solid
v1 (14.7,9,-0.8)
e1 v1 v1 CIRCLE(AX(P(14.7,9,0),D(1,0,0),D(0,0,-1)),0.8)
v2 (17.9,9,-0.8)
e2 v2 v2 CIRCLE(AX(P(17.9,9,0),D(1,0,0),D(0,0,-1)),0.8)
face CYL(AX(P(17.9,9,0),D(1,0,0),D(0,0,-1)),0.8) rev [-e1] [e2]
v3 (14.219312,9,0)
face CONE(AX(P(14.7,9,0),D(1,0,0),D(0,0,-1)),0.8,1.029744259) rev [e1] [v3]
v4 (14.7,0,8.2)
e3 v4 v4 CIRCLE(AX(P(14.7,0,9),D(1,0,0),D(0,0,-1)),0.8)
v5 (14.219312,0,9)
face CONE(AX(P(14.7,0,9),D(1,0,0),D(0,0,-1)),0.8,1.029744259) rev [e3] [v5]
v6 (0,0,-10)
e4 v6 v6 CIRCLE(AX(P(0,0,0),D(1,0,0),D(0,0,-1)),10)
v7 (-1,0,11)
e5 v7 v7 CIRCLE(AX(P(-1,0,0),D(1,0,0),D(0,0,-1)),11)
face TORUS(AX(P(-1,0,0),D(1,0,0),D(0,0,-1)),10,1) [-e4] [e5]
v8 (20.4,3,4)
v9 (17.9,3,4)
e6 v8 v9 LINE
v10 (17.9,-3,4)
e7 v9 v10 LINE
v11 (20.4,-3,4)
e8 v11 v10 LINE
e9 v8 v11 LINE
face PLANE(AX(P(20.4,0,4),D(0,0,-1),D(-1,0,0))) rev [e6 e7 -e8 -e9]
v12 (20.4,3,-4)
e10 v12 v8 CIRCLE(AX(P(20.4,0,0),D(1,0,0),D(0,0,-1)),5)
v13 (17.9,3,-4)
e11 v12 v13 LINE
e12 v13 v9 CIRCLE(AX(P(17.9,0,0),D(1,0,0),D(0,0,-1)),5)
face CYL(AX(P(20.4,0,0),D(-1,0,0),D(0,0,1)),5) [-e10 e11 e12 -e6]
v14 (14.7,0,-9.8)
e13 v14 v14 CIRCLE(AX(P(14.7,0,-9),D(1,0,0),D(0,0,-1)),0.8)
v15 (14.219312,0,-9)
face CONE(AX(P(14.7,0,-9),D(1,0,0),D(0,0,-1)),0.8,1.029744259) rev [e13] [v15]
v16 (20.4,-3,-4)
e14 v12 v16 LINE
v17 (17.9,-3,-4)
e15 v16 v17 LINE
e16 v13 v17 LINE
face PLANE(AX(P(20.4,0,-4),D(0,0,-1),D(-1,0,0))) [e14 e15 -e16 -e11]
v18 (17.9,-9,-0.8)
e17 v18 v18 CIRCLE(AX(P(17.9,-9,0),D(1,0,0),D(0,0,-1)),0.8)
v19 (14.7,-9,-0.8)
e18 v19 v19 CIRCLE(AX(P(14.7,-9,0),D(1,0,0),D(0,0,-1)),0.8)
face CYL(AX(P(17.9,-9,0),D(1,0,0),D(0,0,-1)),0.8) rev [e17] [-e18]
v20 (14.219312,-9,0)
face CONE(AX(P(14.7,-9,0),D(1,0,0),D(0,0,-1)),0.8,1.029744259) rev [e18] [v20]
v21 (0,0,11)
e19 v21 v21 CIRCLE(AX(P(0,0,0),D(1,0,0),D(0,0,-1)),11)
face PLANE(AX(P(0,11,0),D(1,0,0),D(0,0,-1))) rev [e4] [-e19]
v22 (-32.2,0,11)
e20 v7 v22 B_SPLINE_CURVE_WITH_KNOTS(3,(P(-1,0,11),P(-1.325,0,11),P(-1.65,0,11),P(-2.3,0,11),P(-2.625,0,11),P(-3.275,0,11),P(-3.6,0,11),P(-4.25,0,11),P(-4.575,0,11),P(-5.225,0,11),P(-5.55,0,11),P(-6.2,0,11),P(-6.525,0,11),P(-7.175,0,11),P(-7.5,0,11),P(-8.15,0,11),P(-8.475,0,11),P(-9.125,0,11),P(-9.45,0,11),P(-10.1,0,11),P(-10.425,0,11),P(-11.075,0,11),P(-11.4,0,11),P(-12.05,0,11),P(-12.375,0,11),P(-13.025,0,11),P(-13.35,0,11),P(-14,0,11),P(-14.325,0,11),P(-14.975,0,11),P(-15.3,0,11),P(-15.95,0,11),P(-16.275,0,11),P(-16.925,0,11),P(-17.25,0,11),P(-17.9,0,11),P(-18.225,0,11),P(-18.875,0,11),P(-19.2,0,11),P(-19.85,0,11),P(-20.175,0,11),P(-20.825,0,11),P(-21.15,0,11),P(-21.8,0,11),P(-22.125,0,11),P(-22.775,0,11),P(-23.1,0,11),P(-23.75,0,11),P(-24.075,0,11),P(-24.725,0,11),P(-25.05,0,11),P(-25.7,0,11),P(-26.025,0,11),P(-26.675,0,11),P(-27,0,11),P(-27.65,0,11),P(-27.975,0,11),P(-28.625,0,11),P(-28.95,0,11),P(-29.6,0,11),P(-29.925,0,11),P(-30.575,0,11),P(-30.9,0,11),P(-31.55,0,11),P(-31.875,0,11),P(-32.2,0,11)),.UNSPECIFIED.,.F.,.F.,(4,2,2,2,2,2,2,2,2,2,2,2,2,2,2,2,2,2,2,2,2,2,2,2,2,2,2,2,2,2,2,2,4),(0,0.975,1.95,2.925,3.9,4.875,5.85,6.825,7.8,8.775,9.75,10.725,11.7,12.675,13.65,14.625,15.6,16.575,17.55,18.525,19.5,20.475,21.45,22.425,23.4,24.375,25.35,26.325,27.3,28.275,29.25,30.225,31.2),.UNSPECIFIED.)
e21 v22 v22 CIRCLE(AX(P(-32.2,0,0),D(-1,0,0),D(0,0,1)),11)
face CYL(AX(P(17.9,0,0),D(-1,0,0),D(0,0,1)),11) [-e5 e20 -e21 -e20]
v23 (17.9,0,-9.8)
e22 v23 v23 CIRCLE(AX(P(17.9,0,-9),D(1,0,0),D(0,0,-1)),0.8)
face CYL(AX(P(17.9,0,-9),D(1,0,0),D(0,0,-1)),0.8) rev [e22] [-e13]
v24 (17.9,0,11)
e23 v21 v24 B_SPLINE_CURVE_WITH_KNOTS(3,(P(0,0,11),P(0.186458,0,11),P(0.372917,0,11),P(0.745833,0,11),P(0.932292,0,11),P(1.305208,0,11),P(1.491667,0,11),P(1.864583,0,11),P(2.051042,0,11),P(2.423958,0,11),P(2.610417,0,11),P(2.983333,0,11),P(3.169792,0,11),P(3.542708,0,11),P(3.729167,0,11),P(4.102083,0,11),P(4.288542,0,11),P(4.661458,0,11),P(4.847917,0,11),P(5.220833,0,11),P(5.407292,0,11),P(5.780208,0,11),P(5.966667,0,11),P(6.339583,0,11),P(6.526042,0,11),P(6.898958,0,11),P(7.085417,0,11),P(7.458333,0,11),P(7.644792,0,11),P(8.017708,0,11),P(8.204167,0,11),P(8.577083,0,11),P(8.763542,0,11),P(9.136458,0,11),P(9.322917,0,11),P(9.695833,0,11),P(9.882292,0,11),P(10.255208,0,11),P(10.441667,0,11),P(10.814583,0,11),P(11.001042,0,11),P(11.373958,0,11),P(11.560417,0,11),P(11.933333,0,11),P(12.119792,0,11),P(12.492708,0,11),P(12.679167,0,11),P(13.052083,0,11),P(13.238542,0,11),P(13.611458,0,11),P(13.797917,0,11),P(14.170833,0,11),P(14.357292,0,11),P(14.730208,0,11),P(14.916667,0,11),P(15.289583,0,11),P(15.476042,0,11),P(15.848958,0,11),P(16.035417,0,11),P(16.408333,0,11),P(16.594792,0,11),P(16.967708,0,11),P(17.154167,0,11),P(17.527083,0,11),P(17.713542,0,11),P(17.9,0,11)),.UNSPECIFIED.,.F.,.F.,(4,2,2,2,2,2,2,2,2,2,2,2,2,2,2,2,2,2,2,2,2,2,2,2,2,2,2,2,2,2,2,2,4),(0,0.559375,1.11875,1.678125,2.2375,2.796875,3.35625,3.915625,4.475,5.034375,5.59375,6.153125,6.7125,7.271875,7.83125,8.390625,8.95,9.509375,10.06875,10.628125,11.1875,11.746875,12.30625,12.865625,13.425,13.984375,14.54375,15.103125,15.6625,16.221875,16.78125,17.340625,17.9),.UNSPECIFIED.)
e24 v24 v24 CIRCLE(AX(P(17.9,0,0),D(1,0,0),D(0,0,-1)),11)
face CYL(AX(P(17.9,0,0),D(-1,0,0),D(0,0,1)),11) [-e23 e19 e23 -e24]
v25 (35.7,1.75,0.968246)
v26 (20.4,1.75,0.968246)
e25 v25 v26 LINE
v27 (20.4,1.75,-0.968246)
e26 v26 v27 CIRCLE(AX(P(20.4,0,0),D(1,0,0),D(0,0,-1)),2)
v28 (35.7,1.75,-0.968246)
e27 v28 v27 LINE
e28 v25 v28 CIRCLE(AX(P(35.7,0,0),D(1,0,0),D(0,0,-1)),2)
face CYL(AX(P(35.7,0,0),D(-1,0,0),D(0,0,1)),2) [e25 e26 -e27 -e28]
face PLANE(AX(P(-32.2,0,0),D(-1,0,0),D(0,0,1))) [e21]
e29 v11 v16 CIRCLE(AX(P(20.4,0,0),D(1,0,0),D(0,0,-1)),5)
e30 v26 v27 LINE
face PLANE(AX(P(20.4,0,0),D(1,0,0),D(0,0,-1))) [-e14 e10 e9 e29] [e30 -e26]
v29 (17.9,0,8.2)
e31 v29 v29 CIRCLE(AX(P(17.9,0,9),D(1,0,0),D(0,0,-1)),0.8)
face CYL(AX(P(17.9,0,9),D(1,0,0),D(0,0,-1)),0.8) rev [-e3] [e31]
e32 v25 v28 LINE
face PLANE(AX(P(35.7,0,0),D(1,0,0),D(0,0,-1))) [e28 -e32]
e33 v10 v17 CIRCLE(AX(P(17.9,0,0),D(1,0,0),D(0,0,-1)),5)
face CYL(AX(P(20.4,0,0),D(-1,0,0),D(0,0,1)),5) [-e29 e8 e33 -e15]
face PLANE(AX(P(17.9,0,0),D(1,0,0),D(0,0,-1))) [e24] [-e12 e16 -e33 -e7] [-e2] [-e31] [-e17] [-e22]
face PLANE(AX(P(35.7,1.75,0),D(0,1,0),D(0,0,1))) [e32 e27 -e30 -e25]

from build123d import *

# Parameters (mm, degrees)
SKETCH1_R           = 11
BOSS_EXTRUDE1_DEPTH = 17.9
BOSS_EXTRUDE2_START = 32.2
SKETCH2_R           = 11
BOSS_EXTRUDE2_DEPTH = 32.2
BOSS_EXTRUDE3_DEPTH = 2.5
BOSS_EXTRUDE4_DEPTH = 15.3


# Read off the part's stored shape, not the designer's step: AdvancedHole1
with BuildPart() as part:
    # Sketch1 → Boss-Extrude1 (new body)
    with BuildSketch(Plane(origin=(0, 0, 0), x_dir=(0, 0, -1), z_dir=(1, 0, 0))):
        with Locations(Location((0, 0, 0), (0, 0, 180))):
            Circle(SKETCH1_R)
    extrude(amount=BOSS_EXTRUDE1_DEPTH)

    # Sketch2 → Boss-Extrude2 (add)
    with BuildSketch(Plane.ZY.offset(BOSS_EXTRUDE2_START)):
        Circle(SKETCH2_R)
    extrude(amount=-BOSS_EXTRUDE2_DEPTH)

    # Sketch3 → Cut-Revolve1 (revolve, cut)
    with BuildSketch(Plane.XY, mode=Mode.PRIVATE) as cut_revolve1_sk:
        with BuildLine():
            Line((0, 11), (0, 10))
            ThreePointArc((0, 10), (-0.292893219, 10.707106781), (-1, 11))
            Line((-1, 11), (0, 11))
        make_face()
    revolve(cut_revolve1_sk.sketch.rotate(Axis((17.9, 0, 0), (-1, 0, 0)), 270), axis=Axis((17.9, 0, 0), (-1, 0, 0)), mode=Mode.SUBTRACT)

    # Sketch4 → Boss-Extrude3 (add)
    with BuildSketch(Plane(origin=(17.9, 0, 0), x_dir=(0, 0, -1), z_dir=(1, 0, 0))):
        with BuildLine():
            ThreePointArc((4, 3), (2.236067977, 4.472135955), (0, 5))
            Line((0, 5), (0, -5))
            ThreePointArc((0, -5), (2.236067977, -4.472135955), (4, -3))
            Line((4, -3), (4, 3))
        make_face()
        with BuildLine():
            ThreePointArc((0, 5), (-2.236067977, 4.472135955), (-4, 3))
            Line((-4, 3), (-4, -3))
            ThreePointArc((-4, -3), (-2.236067977, -4.472135955), (0, -5))
            Line((0, -5), (0, 5))
        make_face()
    extrude(amount=BOSS_EXTRUDE3_DEPTH)

    # Sketch5 → Boss-Extrude4 (add)
    with BuildSketch(Plane(origin=(20.4, 0, 0), x_dir=(0, 0, -1), z_dir=(1, 0, 0))):
        with BuildLine():
            Line((0.968245837, 1.75), (-0.968245837, 1.75))
            ThreePointArc((-0.968245837, 1.75), (-1.015753003, -1.722859784), (2, 0))
            ThreePointArc((2, 0), (1.722859784, 1.015753003), (0.968245837, 1.75))
        make_face()
    extrude(amount=BOSS_EXTRUDE4_DEPTH)

    # AdvancedHole1 outline → AdvancedHole1 (revolve, cut)
    with BuildSketch(Plane(origin=(0, -9, 0), x_dir=(0, 1, 0), z_dir=(0, 0, -1))):
        Polygon((0, 14.219311505), (0.8, 14.7), (0.8, 17.9), (0, 17.9), align=None)
    revolve(axis=Axis((0, -9, 0), (1, 0, 0)), mode=Mode.SUBTRACT)

    # AdvancedHole1 2 outline → AdvancedHole1 2 (revolve, cut)
    with BuildSketch(Plane.YX.offset(9)):
        Polygon((0, 14.219311505), (0.8, 14.7), (0.8, 17.9), (0, 17.9), align=None)
    revolve(axis=Axis((0, 0, -9), (1, 0, 0)), mode=Mode.SUBTRACT)

    # AdvancedHole1 3 outline → AdvancedHole1 3 (revolve, cut)
    with BuildSketch(Plane.YX.offset(-9)):
        Polygon((0, 14.219311505), (0.8, 14.7), (0.8, 17.9), (0, 17.9), align=None)
    revolve(axis=Axis((0, 0, 9), (1, 0, 0)), mode=Mode.SUBTRACT)

    # AdvancedHole1 4 outline → AdvancedHole1 4 (revolve, cut)
    with BuildSketch(Plane(origin=(0, 9, 0), x_dir=(0, 1, 0), z_dir=(0, 0, -1))):
        Polygon((0, 14.219311505), (0.8, 14.7), (0.8, 17.9), (0, 17.9), align=None)
    revolve(axis=Axis((0, 9, 0), (1, 0, 0)), mode=Mode.SUBTRACT)


solid = part.part
